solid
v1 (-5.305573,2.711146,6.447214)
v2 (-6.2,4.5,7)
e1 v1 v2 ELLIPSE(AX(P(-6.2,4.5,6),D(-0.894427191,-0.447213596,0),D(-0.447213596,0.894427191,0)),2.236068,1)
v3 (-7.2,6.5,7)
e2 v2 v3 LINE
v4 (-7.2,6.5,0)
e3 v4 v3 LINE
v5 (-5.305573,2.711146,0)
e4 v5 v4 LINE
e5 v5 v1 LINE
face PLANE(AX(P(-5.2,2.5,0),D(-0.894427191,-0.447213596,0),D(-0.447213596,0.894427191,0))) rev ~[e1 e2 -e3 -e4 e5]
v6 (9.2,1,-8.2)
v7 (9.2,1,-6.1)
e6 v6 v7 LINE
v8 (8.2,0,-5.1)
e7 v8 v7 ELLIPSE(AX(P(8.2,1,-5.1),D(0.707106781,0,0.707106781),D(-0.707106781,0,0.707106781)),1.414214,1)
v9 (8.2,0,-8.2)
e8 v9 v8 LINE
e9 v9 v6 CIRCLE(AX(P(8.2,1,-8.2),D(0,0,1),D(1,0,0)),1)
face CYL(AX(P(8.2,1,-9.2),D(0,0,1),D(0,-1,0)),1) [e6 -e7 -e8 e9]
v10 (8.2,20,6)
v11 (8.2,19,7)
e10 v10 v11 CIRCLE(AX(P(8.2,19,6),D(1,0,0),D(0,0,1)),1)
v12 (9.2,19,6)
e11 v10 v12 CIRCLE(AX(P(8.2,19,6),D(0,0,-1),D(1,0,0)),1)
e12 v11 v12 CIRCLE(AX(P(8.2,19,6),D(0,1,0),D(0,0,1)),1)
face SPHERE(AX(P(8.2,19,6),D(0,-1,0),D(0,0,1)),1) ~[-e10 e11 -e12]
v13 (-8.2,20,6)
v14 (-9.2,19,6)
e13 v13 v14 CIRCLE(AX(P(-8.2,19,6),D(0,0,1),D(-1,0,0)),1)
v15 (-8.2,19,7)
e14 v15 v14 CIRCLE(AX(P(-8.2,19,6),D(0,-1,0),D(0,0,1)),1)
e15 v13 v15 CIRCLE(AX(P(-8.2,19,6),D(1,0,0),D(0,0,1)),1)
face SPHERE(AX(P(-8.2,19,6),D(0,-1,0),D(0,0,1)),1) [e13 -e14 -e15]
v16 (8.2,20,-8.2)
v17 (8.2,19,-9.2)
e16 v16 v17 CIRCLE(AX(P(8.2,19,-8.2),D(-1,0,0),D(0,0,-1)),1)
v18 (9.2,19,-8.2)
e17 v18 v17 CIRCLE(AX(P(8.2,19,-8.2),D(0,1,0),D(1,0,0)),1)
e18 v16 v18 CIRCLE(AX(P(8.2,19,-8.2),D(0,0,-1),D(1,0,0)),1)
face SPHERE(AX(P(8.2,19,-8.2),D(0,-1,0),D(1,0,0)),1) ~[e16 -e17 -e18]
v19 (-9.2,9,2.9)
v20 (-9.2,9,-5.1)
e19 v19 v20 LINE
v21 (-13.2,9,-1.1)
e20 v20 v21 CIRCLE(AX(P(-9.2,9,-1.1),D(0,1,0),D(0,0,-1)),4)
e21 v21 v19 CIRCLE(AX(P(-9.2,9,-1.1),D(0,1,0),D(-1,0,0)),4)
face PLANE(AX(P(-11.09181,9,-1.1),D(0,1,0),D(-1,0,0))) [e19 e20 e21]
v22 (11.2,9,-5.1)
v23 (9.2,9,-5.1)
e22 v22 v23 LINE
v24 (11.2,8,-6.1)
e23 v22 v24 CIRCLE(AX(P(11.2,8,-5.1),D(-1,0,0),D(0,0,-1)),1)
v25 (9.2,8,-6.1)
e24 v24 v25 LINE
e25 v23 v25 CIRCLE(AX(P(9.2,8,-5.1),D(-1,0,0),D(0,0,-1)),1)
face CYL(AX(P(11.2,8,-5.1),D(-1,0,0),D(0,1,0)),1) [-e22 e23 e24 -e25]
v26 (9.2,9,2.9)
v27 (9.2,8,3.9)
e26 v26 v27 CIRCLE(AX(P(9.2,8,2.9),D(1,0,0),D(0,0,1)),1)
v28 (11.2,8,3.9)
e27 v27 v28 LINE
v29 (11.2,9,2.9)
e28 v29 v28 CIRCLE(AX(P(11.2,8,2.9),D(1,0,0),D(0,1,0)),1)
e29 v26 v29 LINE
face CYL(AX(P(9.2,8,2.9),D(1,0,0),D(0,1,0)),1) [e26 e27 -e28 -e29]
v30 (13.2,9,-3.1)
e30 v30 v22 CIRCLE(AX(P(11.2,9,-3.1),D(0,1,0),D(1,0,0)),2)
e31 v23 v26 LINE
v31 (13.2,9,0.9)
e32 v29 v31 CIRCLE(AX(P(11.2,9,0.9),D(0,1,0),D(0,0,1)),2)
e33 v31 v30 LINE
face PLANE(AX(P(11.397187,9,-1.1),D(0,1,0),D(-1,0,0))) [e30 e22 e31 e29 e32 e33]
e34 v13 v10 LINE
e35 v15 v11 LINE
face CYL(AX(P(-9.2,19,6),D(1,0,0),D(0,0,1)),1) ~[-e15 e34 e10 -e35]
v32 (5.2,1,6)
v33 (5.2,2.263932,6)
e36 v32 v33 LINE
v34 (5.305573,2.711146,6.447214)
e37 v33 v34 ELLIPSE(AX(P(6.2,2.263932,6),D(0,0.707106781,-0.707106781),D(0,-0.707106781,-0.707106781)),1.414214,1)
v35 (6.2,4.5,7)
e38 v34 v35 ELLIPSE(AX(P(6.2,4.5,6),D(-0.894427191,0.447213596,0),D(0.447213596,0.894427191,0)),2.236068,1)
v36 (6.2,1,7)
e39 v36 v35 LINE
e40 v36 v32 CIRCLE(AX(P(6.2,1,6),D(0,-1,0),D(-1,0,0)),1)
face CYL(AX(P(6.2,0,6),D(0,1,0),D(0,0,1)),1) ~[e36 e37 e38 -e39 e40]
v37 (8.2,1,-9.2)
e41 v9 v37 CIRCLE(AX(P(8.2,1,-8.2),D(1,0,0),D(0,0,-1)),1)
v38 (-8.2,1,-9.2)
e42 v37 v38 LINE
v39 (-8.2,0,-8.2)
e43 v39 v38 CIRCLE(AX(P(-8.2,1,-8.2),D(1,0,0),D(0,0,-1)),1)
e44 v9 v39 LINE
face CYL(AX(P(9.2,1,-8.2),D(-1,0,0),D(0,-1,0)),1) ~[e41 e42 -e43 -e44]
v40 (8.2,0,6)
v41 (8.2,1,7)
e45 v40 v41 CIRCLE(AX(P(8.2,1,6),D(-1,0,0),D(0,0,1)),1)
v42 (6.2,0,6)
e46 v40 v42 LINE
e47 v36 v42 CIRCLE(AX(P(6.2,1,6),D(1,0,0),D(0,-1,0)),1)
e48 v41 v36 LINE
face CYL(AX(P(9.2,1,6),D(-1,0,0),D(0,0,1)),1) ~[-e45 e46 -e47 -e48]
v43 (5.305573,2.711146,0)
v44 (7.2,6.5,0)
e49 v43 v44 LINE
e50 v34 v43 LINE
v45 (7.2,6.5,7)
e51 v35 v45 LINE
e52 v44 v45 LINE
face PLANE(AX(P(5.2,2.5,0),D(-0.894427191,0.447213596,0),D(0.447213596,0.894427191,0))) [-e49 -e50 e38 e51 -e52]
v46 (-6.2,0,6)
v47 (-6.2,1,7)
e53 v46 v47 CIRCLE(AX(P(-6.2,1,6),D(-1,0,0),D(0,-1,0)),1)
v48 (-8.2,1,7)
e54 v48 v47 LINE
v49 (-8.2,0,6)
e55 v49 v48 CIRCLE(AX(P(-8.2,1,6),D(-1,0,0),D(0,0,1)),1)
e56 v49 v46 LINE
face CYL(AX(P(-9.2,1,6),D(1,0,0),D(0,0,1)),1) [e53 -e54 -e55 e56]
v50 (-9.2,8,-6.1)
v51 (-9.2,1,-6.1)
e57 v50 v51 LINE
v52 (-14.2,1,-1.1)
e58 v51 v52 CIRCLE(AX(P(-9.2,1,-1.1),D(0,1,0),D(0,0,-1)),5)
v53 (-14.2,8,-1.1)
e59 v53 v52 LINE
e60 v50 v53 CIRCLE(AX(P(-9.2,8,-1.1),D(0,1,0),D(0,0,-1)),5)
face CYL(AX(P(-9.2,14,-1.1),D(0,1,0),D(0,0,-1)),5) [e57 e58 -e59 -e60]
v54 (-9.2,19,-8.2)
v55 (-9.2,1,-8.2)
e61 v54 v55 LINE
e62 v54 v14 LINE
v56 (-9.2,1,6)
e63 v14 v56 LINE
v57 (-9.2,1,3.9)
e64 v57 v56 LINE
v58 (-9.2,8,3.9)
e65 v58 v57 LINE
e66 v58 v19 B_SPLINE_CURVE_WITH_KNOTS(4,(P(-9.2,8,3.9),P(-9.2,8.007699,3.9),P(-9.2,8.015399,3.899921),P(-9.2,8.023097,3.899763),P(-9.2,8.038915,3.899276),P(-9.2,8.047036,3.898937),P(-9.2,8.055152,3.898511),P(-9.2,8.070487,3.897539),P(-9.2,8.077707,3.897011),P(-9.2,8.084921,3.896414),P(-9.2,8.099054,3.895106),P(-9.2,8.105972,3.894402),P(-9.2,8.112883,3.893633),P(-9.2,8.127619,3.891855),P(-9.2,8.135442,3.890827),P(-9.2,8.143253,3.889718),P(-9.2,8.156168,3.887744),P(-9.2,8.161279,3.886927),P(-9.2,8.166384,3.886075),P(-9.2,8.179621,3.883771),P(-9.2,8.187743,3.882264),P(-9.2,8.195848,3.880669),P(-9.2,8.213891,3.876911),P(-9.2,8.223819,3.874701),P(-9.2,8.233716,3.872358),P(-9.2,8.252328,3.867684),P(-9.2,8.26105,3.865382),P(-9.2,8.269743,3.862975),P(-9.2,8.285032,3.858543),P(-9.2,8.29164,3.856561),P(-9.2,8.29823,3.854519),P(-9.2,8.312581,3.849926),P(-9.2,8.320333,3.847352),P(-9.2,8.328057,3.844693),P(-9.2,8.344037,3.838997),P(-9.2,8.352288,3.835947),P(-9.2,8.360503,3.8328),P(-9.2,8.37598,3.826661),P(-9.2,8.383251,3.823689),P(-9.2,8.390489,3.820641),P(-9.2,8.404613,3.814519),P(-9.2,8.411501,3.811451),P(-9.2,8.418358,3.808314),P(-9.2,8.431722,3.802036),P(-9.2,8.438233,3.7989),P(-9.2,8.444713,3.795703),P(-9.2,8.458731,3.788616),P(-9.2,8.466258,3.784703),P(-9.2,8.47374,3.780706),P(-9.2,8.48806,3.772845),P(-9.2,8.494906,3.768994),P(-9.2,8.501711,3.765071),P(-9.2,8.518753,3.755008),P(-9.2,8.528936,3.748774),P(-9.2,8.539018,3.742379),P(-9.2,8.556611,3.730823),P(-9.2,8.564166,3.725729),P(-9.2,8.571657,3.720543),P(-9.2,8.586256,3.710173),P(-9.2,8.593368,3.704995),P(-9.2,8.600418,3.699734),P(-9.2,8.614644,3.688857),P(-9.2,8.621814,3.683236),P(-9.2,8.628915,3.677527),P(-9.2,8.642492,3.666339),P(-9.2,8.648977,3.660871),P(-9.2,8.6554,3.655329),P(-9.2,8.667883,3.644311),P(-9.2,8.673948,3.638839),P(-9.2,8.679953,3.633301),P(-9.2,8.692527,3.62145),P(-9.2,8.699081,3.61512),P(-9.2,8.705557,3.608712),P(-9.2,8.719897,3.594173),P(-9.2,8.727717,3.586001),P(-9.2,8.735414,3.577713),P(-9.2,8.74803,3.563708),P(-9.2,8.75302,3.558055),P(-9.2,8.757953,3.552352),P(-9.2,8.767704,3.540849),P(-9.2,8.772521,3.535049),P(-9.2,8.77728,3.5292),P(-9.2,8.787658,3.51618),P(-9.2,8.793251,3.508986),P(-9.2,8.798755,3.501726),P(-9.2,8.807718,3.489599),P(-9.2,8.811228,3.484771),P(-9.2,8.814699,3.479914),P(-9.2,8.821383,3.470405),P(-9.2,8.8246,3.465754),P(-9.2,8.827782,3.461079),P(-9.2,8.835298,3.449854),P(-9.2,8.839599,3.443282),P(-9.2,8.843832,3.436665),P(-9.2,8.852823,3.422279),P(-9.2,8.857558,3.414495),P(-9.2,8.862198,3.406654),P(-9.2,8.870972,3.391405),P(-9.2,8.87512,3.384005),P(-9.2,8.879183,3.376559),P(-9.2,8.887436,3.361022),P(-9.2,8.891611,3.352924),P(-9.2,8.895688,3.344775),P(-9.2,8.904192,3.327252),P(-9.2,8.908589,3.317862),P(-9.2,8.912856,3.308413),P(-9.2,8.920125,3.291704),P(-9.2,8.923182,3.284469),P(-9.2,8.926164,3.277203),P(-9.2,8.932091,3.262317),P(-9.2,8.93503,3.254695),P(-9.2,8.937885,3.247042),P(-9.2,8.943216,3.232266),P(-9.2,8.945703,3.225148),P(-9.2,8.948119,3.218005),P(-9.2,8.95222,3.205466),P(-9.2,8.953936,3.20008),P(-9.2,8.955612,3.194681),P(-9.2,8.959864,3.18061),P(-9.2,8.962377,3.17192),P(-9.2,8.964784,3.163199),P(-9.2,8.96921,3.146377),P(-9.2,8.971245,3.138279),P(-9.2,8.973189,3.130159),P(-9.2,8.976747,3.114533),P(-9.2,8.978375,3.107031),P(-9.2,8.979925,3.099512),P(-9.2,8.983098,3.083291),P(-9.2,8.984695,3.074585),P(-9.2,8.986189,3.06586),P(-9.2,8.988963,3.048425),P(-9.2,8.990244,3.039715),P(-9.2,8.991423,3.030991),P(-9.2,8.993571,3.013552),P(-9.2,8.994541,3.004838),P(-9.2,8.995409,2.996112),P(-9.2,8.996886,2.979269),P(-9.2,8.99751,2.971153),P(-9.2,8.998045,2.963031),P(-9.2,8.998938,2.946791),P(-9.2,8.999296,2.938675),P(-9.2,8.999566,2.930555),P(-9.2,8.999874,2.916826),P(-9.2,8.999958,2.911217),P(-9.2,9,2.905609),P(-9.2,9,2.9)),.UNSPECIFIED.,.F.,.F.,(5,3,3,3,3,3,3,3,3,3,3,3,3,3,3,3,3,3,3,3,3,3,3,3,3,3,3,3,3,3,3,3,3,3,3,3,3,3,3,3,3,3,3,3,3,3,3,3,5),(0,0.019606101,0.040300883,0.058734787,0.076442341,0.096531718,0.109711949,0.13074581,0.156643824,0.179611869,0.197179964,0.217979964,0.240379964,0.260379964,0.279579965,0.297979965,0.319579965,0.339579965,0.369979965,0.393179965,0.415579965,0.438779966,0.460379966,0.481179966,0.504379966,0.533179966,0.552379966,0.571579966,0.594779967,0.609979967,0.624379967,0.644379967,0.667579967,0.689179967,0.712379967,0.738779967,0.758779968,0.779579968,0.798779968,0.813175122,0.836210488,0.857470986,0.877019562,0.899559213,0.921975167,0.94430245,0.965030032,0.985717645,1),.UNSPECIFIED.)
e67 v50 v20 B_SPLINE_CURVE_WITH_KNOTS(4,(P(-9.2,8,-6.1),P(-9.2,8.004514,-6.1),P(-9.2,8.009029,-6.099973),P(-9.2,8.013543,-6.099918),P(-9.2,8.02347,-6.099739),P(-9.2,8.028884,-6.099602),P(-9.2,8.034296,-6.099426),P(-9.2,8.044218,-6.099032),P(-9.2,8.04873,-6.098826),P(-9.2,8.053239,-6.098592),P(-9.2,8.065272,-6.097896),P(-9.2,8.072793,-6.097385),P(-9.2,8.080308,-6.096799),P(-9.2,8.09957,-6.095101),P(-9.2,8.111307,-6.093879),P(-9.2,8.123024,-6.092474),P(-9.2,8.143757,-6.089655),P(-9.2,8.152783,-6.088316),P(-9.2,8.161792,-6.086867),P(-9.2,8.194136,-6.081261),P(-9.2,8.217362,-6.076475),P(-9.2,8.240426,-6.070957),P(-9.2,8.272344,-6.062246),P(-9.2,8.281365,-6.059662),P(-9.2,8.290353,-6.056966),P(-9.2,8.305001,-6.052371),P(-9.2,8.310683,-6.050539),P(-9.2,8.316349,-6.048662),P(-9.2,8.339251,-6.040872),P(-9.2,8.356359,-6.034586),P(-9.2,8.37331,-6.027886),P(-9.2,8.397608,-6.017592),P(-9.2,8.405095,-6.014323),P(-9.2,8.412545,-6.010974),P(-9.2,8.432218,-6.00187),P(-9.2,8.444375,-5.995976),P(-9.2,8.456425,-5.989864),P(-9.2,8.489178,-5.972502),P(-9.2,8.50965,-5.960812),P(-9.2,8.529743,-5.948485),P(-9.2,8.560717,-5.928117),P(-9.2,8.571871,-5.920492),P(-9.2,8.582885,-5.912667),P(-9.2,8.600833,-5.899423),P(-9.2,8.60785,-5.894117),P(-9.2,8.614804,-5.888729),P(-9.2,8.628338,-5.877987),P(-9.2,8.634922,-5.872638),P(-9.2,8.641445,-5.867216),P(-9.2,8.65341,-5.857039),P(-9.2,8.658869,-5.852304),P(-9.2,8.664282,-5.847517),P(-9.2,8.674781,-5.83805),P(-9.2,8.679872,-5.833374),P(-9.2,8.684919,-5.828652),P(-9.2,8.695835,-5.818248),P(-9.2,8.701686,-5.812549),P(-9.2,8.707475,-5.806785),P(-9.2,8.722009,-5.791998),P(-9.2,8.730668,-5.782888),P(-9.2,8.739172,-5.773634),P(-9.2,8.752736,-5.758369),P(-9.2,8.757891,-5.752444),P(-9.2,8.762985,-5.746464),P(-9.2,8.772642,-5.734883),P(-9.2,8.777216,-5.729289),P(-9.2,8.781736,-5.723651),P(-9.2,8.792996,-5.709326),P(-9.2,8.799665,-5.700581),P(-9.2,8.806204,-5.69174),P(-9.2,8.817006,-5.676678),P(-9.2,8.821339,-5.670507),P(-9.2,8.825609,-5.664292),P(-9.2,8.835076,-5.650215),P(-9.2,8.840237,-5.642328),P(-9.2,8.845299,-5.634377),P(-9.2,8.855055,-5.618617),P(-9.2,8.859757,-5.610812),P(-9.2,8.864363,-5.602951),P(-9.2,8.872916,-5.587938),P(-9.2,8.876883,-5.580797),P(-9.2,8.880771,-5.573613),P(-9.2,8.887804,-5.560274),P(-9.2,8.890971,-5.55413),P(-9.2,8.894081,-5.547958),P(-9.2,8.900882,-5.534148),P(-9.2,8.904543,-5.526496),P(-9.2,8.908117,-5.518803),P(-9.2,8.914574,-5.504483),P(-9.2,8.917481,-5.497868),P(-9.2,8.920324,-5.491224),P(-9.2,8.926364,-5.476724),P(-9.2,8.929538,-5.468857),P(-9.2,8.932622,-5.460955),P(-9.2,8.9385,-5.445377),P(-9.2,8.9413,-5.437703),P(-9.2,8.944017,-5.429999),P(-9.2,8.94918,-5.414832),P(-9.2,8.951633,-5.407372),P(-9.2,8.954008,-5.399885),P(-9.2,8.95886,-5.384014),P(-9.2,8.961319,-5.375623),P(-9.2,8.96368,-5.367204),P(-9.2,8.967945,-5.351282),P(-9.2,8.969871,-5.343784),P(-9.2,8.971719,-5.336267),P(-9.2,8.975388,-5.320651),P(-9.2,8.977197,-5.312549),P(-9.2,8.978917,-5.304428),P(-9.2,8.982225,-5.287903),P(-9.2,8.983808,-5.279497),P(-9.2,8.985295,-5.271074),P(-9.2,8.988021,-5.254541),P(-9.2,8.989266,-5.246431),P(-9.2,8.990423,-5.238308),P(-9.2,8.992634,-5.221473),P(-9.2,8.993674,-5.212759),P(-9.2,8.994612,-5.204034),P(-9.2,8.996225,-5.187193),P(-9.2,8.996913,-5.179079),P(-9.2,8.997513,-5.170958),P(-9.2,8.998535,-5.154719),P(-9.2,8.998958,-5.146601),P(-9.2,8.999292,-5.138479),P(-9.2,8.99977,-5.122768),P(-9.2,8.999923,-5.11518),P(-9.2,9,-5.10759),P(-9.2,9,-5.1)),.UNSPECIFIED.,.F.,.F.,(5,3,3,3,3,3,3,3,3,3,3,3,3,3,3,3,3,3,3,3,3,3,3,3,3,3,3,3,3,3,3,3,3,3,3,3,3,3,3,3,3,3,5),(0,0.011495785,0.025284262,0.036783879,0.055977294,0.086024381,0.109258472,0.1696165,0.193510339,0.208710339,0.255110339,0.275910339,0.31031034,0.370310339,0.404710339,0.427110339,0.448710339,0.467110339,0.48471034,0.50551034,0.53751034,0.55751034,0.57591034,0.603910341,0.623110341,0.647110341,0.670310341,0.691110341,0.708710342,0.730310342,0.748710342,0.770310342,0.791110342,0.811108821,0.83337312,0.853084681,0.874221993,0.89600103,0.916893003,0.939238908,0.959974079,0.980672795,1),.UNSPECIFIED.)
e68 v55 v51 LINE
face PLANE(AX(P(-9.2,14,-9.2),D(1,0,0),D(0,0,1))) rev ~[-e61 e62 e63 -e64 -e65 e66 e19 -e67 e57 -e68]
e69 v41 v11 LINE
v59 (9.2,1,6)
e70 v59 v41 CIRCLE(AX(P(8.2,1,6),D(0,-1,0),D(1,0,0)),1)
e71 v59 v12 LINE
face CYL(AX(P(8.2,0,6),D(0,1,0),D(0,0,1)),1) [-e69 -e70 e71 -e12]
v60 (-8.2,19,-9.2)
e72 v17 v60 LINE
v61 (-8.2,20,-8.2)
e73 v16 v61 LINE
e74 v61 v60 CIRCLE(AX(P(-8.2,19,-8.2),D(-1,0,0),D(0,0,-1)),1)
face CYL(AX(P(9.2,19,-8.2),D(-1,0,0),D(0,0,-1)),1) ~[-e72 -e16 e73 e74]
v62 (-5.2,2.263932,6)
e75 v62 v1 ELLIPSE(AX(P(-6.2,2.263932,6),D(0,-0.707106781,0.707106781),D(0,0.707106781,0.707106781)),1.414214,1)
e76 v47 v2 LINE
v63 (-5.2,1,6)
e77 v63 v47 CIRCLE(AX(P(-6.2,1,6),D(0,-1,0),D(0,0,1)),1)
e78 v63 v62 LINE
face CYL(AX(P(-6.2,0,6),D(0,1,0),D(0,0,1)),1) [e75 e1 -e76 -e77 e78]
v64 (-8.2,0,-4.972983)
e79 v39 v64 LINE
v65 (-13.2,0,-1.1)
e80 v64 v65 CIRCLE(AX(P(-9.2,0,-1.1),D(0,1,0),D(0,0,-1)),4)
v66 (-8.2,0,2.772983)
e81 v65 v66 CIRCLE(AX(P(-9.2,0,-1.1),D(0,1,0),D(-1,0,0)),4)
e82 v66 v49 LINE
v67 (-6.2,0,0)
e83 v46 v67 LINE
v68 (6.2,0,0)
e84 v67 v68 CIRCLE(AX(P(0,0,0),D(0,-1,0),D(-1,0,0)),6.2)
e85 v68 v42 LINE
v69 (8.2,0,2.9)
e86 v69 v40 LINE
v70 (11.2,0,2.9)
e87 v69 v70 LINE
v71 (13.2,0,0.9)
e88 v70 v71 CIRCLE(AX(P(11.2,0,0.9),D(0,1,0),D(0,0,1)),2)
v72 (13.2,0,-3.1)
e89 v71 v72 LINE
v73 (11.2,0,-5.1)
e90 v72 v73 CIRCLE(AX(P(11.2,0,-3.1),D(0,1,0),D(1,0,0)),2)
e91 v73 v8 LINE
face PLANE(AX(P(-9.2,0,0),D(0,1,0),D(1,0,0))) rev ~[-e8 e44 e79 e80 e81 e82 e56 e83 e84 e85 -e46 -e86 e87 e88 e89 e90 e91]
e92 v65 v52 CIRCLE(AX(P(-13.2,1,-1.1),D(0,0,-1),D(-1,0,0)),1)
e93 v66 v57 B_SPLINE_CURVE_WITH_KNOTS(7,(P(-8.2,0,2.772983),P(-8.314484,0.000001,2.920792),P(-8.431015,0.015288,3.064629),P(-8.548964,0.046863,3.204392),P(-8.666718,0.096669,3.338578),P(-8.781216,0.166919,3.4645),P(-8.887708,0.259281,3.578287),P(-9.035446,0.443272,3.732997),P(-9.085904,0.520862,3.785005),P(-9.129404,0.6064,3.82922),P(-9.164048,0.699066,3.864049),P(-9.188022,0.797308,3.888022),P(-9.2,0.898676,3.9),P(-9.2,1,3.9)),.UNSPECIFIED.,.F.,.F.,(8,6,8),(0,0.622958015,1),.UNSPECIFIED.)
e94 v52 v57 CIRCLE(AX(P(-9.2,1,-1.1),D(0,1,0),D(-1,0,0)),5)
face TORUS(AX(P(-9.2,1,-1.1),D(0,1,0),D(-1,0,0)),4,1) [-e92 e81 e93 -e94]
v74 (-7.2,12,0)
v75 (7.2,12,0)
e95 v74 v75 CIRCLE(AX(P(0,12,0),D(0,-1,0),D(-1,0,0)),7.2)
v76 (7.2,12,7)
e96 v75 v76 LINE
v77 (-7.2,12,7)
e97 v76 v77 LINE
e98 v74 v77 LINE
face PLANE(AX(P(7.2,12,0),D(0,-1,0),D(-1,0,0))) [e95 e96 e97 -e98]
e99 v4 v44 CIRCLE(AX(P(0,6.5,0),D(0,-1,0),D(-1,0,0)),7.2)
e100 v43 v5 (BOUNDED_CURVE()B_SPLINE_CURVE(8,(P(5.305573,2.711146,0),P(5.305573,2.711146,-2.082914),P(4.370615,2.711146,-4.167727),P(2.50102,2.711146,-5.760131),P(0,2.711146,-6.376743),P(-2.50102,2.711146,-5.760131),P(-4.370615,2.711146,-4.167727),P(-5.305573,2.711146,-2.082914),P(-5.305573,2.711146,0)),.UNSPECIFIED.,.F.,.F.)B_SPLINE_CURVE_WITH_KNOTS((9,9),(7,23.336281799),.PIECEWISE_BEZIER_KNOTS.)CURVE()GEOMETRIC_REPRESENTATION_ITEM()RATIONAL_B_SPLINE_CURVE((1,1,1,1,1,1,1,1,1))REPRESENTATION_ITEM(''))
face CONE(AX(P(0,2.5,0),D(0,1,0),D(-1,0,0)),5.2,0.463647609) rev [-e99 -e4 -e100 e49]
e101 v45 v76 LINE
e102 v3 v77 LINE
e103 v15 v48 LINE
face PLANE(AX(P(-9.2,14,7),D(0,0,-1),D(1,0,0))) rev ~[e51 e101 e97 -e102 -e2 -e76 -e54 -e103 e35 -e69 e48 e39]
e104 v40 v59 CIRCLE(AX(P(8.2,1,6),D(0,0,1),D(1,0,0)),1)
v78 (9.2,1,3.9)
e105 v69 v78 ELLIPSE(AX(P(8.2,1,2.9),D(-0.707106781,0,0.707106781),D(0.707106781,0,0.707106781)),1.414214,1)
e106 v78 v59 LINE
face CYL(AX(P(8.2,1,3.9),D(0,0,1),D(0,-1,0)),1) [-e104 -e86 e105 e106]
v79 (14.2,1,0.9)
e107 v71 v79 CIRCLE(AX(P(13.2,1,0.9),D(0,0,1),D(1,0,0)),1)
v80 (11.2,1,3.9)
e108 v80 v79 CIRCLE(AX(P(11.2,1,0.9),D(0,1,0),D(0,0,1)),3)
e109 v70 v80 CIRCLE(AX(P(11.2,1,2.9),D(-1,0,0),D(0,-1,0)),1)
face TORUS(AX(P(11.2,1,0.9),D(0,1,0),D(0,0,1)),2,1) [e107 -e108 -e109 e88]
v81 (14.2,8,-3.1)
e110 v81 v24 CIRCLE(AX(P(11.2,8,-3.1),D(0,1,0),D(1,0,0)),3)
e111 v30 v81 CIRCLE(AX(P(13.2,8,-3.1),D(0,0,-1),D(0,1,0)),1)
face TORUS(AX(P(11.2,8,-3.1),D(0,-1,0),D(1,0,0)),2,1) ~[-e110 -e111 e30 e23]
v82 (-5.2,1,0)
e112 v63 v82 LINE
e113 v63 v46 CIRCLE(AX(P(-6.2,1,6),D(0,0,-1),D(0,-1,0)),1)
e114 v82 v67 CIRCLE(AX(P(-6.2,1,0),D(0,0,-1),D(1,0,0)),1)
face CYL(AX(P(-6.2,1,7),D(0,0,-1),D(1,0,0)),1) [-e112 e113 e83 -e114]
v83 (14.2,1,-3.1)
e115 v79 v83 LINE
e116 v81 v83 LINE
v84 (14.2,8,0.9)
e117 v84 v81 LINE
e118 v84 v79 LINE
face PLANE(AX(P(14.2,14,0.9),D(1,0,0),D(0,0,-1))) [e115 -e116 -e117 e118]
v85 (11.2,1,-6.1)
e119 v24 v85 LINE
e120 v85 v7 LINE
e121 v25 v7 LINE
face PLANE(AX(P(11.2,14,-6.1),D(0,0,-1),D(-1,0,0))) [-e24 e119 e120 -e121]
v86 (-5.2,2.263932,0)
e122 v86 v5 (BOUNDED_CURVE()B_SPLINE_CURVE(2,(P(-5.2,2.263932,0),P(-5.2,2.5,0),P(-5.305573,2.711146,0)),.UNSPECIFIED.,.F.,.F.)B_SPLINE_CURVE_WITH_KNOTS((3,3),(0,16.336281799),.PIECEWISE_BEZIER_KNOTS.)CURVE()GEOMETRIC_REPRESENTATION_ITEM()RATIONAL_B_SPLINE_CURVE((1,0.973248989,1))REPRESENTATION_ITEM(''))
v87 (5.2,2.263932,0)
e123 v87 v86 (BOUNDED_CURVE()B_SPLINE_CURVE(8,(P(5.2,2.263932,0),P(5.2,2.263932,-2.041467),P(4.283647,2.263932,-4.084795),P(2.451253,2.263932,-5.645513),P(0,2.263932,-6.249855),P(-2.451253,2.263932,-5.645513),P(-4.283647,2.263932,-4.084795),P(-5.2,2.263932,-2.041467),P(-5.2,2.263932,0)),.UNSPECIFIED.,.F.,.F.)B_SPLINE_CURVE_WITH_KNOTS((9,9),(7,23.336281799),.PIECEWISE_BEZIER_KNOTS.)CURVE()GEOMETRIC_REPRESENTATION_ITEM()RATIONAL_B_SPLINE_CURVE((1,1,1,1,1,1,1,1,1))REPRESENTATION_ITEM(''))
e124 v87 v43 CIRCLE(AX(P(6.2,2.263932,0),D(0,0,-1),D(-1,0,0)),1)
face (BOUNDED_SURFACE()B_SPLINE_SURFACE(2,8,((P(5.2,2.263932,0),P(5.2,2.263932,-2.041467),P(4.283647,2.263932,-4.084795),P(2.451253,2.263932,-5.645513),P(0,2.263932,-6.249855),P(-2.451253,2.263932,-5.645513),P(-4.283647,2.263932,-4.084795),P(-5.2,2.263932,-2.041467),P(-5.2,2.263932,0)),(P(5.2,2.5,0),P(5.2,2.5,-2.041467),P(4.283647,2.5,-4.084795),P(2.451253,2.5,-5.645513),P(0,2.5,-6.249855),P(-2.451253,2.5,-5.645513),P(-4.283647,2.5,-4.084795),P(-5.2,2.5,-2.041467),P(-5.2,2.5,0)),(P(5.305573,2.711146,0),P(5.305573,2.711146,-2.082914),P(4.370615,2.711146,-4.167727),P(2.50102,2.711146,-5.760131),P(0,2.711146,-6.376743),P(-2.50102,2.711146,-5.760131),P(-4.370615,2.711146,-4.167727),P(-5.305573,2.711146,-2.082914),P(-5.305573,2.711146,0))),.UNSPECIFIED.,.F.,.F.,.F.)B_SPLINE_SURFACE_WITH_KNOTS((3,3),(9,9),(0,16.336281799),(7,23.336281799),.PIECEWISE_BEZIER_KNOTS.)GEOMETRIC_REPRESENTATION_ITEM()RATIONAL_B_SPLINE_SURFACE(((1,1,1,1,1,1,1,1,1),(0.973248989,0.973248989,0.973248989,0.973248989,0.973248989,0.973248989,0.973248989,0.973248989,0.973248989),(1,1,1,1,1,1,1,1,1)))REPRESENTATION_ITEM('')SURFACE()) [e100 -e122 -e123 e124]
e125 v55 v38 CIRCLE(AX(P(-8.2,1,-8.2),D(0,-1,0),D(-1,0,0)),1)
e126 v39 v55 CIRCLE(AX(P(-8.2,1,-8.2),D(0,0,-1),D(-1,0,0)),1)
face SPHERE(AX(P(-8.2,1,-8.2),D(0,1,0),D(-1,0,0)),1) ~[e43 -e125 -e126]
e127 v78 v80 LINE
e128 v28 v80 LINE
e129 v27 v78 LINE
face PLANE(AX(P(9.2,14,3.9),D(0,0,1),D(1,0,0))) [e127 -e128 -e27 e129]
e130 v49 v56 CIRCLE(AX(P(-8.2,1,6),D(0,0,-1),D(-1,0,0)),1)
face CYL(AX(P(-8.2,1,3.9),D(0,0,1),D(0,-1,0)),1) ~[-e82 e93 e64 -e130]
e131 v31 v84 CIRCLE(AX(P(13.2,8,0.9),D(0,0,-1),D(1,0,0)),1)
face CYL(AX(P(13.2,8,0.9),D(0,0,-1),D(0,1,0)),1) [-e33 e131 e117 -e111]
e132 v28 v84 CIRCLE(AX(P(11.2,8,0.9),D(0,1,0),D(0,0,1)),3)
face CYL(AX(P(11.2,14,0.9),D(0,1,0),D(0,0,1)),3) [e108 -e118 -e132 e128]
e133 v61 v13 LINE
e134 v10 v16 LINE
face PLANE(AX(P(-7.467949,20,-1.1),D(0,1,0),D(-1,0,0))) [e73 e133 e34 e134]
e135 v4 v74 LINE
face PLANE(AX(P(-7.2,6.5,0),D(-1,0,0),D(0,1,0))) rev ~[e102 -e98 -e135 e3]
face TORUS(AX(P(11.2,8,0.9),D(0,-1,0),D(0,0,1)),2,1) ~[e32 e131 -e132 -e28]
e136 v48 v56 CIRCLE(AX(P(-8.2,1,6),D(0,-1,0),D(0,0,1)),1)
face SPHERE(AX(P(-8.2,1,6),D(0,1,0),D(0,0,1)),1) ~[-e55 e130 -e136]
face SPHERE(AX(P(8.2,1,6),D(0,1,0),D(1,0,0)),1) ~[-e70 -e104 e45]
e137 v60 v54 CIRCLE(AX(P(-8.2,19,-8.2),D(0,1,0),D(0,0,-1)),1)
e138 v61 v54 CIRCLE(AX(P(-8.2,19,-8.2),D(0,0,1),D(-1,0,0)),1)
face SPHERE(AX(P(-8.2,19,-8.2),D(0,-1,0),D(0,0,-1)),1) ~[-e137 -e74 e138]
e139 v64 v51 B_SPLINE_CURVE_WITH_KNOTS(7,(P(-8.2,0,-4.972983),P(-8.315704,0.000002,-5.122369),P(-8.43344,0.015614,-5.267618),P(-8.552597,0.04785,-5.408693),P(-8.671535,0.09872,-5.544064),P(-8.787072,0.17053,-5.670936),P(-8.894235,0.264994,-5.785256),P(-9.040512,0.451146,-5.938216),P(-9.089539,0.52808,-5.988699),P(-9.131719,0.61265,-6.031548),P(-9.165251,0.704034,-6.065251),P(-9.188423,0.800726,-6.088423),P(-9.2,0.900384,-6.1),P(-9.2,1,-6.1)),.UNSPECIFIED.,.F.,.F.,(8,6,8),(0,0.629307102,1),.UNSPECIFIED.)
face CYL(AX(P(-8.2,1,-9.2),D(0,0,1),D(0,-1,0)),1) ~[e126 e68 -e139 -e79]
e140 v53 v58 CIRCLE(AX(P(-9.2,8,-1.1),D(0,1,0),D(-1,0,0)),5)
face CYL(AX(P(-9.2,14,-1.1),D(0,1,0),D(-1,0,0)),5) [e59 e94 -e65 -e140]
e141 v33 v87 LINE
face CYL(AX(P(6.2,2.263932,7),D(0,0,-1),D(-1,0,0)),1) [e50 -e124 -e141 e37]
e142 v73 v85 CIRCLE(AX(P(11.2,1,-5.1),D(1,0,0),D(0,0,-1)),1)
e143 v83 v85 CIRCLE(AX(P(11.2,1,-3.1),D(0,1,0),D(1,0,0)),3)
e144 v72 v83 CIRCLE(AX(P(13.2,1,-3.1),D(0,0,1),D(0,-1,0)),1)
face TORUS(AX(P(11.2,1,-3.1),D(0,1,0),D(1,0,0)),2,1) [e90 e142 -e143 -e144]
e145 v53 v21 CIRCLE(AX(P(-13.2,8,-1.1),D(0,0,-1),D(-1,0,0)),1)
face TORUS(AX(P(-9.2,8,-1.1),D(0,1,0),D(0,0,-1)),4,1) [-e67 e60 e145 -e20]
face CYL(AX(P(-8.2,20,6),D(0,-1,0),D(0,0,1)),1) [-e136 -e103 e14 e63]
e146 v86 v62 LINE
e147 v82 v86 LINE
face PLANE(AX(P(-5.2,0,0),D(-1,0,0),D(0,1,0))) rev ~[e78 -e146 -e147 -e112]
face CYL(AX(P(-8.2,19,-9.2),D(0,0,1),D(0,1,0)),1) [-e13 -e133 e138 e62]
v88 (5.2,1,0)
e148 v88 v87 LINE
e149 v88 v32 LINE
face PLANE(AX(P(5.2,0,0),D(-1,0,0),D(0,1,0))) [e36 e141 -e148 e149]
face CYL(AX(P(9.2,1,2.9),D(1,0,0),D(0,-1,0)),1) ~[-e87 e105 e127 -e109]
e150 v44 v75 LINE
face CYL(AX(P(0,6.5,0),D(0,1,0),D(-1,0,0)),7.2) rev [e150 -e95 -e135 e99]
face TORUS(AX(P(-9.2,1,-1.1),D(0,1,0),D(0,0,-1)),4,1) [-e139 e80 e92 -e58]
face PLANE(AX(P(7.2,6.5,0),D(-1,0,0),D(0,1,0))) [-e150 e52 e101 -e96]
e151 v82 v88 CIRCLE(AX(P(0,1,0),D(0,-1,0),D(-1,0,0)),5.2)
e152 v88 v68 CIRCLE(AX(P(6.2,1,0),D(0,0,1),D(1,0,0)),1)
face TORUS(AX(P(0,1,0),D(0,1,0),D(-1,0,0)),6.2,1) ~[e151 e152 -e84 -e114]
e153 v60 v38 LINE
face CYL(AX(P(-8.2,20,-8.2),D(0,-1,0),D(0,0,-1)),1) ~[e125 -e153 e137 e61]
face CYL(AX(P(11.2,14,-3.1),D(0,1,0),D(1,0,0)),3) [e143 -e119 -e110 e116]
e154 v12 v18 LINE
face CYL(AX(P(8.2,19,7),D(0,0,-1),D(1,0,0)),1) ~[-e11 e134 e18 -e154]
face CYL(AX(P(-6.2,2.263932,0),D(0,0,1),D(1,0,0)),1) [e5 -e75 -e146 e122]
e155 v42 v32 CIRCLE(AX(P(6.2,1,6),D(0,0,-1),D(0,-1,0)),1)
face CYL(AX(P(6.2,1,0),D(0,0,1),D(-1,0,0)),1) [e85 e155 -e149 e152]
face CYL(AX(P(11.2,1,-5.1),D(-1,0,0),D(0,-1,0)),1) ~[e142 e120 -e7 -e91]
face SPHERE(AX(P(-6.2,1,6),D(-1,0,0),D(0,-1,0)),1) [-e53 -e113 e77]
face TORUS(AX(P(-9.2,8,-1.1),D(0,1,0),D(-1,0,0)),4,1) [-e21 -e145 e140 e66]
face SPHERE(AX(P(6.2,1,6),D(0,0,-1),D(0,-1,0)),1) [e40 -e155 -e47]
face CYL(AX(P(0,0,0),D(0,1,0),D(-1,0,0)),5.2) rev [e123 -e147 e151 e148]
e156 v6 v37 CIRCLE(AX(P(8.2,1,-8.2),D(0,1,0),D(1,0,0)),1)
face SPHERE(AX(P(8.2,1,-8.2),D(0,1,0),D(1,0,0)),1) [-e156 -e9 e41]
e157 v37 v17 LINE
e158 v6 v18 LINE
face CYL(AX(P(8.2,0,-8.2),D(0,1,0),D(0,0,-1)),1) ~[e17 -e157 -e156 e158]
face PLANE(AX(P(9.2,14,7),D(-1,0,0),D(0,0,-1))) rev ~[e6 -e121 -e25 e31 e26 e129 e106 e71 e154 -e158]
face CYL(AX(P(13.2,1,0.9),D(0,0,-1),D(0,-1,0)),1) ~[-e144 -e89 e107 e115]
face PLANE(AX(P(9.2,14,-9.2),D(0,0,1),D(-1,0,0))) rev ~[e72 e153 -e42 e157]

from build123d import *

# Parameters (mm, degrees)
F1_ANGLE = 180
F3_DEPTH = 14
F4_DEPTH = 7
F6_DEPTH = 14
F7_DEPTH = 5
F5_W     = 5
F5_H     = 10
F8_DEPTH = 6
F9_R     = 1


with BuildPart() as f1:
    # F0 (on Top) → F1 (revolve)
    with BuildSketch(Plane.XY):
        Polygon((-9.2, 14), (-9.2, 0), (-5.2, 0), (-5.2, 2.5), (-7.2, 6.5), (-7.2, 12), (0, 12), (0, 14), align=None)
    revolve(axis=Axis((0, -5.2679181099, 0), (0, -1, 0)), revolution_arc=F1_ANGLE)

    # F2 (on face) → F3 (join, through all)
    with BuildSketch(Plane(origin=(0, 14, 0), x_dir=(-1, 0, 0), z_dir=(0, 1, 0))):
        with BuildLine():
            ThreePointArc((-7.9e-09, -9.2), (-6.5053823897, -6.5053823841), (-9.2, 0))
            Line((-9.2, 0), (-9.2, -9.2))
            Line((-9.2, -9.2), (-7.9e-09, -9.2))
        make_face()
        with BuildLine():
            ThreePointArc((9.2, 0), (6.5053823841, -6.5053823897), (-7.9e-09, -9.2))
            Line((-7.9e-09, -9.2), (9.2, -9.2))
            Line((9.2, -9.2), (9.2, 0))
        make_face()
    extrude(amount=-F3_DEPTH)

    # F4 (add): a face of the model
    f4_faces = [f1.faces().sort_by_distance(p)[0] for p in [
        (-8.9687944637, 7, 0),
    ]]
    extrude(f4_faces, amount=F4_DEPTH)

    # F5 (on face) → F6 (join, through all)
    with BuildSketch(Plane(origin=(0, 14, 0), x_dir=(-1, 0, 0), z_dir=(0, 1, 0))):
        with BuildLine():
            ThreePointArc((9.2, -6.1), (12.7355339059, -4.6355339059), (14.2, -1.1))
            ThreePointArc((14.2, -1.1), (12.7355339059, 2.4355339059), (9.2, 3.9))
            Line((9.2, 3.9), (9.2, -6.1))
        make_face()
        with BuildLine():
            Line((-9.2, -6.1), (-9.2, 3.9))
            Line((-9.2, 3.9), (-11.2, 3.9))
            ThreePointArc((-11.2, 3.9), (-13.3213203436, 3.0213203436), (-14.2, 0.9))
            Line((-14.2, 0.9), (-14.2, -3.1))
            ThreePointArc((-14.2, -3.1), (-13.3213203436, -5.2213203436), (-11.2, -6.1))
            Line((-11.2, -6.1), (-9.2, -6.1))
        make_face()
    extrude(amount=-F6_DEPTH)

    # F5 (on face) → F7 (cut)
    with BuildSketch(Plane(origin=(0, 14, 0), x_dir=(-1, 0, 0), z_dir=(0, 1, 0))):
        with BuildLine():
            ThreePointArc((9.2, -6.1), (12.7355339059, -4.6355339059), (14.2, -1.1))
            ThreePointArc((14.2, -1.1), (12.7355339059, 2.4355339059), (9.2, 3.9))
            Line((9.2, 3.9), (9.2, -6.1))
        make_face()
        with BuildLine():
            Line((-9.2, -6.1), (-9.2, 3.9))
            Line((-9.2, 3.9), (-11.2, 3.9))
            ThreePointArc((-11.2, 3.9), (-13.3213203436, 3.0213203436), (-14.2, 0.9))
            Line((-14.2, 0.9), (-14.2, -3.1))
            ThreePointArc((-14.2, -3.1), (-13.3213203436, -5.2213203436), (-11.2, -6.1))
            Line((-11.2, -6.1), (-9.2, -6.1))
        make_face()
    extrude(amount=-F7_DEPTH, mode=Mode.SUBTRACT)

    # F5 (on face) → F8 (join)
    with BuildSketch(Plane(origin=(0, 14, 0), x_dir=(-1, 0, 0), z_dir=(0, 1, 0))):
        with BuildLine():
            Line((9.2, -6.1), (9.2, 3.9))
            ThreePointArc((9.2, 3.9), (4.2, -1.1), (9.2, -6.1))
        make_face()
        with BuildLine():
            ThreePointArc((9.2, -6.1), (4.2, -1.1), (9.2, 3.9))
            Line((9.2, 3.9), (9.2, 7))
            Line((9.2, 7), (-9.2, 7))
            Line((-9.2, 7), (-9.2, 3.9))
            Line((-9.2, 3.9), (-4.2, 3.9))
            Line((-4.2, 3.9), (-4.2, -6.1))
            Line((-4.2, -6.1), (-9.2, -6.1))
            Line((-9.2, -6.1), (-9.2, -9.2))
            Line((-9.2, -9.2), (9.2, -9.2))
            Line((9.2, -9.2), (9.2, -6.1))
        make_face()
        with Locations((-6.7, -1.1)):
            Rectangle(F5_W, F5_H)
    extrude(amount=F8_DEPTH)

    # F9
    f9_edges = [f1.edges().sort_by_distance(p)[0] for p in [
        (9.2, 10, 7),
        (-9.2, 10, 7),
        (9.2, 10, -9.2),
        (-9.2, 10, -9.2),
        (-7.2, 0, 7),
        (9.2, 0, 5.45),
        (9.2, 0, -7.65),
        (-9.2, 0, -7.65),
        (-9.2, 0, 5.45),
        (0, 0, -9.2),
        (0, 0, -5.2),
        (-5.2, 0, 3.5),
        (-14.2, 0, -1.1),
        (10.2, 0, -6.1),
        (13.32132, 0, -5.22132),
        (14.2, 0, -1.1),
        (13.32132, 0, 3.02132),
        (10.2, 0, 3.9),
        (7.2, 0, 7),
        (5.2, 0, 3.5),
        (0, 20, 7),
        (9.2, 20, -1.1),
        (0, 20, -9.2),
        (-9.2, 20, -1.1),
        (-14.2, 9, -1.1),
        (14.2, 9, -1.1),
        (-5.2, 2.5, 3.5),
        (-5.2, 1.25, 7),
        (5.2, 1.25, 7),
        (10.2, 9, -6.1),
        (13.32132, 9, -5.22132),
        (13.32132, 9, 3.02132),
        (10.2, 9, 3.9),
        (5.2, 2.5, 3.5),
        (0, 2.5, -5.2),
    ]]
    fillet(f9_edges, radius=F9_R)


solid = f1.part
